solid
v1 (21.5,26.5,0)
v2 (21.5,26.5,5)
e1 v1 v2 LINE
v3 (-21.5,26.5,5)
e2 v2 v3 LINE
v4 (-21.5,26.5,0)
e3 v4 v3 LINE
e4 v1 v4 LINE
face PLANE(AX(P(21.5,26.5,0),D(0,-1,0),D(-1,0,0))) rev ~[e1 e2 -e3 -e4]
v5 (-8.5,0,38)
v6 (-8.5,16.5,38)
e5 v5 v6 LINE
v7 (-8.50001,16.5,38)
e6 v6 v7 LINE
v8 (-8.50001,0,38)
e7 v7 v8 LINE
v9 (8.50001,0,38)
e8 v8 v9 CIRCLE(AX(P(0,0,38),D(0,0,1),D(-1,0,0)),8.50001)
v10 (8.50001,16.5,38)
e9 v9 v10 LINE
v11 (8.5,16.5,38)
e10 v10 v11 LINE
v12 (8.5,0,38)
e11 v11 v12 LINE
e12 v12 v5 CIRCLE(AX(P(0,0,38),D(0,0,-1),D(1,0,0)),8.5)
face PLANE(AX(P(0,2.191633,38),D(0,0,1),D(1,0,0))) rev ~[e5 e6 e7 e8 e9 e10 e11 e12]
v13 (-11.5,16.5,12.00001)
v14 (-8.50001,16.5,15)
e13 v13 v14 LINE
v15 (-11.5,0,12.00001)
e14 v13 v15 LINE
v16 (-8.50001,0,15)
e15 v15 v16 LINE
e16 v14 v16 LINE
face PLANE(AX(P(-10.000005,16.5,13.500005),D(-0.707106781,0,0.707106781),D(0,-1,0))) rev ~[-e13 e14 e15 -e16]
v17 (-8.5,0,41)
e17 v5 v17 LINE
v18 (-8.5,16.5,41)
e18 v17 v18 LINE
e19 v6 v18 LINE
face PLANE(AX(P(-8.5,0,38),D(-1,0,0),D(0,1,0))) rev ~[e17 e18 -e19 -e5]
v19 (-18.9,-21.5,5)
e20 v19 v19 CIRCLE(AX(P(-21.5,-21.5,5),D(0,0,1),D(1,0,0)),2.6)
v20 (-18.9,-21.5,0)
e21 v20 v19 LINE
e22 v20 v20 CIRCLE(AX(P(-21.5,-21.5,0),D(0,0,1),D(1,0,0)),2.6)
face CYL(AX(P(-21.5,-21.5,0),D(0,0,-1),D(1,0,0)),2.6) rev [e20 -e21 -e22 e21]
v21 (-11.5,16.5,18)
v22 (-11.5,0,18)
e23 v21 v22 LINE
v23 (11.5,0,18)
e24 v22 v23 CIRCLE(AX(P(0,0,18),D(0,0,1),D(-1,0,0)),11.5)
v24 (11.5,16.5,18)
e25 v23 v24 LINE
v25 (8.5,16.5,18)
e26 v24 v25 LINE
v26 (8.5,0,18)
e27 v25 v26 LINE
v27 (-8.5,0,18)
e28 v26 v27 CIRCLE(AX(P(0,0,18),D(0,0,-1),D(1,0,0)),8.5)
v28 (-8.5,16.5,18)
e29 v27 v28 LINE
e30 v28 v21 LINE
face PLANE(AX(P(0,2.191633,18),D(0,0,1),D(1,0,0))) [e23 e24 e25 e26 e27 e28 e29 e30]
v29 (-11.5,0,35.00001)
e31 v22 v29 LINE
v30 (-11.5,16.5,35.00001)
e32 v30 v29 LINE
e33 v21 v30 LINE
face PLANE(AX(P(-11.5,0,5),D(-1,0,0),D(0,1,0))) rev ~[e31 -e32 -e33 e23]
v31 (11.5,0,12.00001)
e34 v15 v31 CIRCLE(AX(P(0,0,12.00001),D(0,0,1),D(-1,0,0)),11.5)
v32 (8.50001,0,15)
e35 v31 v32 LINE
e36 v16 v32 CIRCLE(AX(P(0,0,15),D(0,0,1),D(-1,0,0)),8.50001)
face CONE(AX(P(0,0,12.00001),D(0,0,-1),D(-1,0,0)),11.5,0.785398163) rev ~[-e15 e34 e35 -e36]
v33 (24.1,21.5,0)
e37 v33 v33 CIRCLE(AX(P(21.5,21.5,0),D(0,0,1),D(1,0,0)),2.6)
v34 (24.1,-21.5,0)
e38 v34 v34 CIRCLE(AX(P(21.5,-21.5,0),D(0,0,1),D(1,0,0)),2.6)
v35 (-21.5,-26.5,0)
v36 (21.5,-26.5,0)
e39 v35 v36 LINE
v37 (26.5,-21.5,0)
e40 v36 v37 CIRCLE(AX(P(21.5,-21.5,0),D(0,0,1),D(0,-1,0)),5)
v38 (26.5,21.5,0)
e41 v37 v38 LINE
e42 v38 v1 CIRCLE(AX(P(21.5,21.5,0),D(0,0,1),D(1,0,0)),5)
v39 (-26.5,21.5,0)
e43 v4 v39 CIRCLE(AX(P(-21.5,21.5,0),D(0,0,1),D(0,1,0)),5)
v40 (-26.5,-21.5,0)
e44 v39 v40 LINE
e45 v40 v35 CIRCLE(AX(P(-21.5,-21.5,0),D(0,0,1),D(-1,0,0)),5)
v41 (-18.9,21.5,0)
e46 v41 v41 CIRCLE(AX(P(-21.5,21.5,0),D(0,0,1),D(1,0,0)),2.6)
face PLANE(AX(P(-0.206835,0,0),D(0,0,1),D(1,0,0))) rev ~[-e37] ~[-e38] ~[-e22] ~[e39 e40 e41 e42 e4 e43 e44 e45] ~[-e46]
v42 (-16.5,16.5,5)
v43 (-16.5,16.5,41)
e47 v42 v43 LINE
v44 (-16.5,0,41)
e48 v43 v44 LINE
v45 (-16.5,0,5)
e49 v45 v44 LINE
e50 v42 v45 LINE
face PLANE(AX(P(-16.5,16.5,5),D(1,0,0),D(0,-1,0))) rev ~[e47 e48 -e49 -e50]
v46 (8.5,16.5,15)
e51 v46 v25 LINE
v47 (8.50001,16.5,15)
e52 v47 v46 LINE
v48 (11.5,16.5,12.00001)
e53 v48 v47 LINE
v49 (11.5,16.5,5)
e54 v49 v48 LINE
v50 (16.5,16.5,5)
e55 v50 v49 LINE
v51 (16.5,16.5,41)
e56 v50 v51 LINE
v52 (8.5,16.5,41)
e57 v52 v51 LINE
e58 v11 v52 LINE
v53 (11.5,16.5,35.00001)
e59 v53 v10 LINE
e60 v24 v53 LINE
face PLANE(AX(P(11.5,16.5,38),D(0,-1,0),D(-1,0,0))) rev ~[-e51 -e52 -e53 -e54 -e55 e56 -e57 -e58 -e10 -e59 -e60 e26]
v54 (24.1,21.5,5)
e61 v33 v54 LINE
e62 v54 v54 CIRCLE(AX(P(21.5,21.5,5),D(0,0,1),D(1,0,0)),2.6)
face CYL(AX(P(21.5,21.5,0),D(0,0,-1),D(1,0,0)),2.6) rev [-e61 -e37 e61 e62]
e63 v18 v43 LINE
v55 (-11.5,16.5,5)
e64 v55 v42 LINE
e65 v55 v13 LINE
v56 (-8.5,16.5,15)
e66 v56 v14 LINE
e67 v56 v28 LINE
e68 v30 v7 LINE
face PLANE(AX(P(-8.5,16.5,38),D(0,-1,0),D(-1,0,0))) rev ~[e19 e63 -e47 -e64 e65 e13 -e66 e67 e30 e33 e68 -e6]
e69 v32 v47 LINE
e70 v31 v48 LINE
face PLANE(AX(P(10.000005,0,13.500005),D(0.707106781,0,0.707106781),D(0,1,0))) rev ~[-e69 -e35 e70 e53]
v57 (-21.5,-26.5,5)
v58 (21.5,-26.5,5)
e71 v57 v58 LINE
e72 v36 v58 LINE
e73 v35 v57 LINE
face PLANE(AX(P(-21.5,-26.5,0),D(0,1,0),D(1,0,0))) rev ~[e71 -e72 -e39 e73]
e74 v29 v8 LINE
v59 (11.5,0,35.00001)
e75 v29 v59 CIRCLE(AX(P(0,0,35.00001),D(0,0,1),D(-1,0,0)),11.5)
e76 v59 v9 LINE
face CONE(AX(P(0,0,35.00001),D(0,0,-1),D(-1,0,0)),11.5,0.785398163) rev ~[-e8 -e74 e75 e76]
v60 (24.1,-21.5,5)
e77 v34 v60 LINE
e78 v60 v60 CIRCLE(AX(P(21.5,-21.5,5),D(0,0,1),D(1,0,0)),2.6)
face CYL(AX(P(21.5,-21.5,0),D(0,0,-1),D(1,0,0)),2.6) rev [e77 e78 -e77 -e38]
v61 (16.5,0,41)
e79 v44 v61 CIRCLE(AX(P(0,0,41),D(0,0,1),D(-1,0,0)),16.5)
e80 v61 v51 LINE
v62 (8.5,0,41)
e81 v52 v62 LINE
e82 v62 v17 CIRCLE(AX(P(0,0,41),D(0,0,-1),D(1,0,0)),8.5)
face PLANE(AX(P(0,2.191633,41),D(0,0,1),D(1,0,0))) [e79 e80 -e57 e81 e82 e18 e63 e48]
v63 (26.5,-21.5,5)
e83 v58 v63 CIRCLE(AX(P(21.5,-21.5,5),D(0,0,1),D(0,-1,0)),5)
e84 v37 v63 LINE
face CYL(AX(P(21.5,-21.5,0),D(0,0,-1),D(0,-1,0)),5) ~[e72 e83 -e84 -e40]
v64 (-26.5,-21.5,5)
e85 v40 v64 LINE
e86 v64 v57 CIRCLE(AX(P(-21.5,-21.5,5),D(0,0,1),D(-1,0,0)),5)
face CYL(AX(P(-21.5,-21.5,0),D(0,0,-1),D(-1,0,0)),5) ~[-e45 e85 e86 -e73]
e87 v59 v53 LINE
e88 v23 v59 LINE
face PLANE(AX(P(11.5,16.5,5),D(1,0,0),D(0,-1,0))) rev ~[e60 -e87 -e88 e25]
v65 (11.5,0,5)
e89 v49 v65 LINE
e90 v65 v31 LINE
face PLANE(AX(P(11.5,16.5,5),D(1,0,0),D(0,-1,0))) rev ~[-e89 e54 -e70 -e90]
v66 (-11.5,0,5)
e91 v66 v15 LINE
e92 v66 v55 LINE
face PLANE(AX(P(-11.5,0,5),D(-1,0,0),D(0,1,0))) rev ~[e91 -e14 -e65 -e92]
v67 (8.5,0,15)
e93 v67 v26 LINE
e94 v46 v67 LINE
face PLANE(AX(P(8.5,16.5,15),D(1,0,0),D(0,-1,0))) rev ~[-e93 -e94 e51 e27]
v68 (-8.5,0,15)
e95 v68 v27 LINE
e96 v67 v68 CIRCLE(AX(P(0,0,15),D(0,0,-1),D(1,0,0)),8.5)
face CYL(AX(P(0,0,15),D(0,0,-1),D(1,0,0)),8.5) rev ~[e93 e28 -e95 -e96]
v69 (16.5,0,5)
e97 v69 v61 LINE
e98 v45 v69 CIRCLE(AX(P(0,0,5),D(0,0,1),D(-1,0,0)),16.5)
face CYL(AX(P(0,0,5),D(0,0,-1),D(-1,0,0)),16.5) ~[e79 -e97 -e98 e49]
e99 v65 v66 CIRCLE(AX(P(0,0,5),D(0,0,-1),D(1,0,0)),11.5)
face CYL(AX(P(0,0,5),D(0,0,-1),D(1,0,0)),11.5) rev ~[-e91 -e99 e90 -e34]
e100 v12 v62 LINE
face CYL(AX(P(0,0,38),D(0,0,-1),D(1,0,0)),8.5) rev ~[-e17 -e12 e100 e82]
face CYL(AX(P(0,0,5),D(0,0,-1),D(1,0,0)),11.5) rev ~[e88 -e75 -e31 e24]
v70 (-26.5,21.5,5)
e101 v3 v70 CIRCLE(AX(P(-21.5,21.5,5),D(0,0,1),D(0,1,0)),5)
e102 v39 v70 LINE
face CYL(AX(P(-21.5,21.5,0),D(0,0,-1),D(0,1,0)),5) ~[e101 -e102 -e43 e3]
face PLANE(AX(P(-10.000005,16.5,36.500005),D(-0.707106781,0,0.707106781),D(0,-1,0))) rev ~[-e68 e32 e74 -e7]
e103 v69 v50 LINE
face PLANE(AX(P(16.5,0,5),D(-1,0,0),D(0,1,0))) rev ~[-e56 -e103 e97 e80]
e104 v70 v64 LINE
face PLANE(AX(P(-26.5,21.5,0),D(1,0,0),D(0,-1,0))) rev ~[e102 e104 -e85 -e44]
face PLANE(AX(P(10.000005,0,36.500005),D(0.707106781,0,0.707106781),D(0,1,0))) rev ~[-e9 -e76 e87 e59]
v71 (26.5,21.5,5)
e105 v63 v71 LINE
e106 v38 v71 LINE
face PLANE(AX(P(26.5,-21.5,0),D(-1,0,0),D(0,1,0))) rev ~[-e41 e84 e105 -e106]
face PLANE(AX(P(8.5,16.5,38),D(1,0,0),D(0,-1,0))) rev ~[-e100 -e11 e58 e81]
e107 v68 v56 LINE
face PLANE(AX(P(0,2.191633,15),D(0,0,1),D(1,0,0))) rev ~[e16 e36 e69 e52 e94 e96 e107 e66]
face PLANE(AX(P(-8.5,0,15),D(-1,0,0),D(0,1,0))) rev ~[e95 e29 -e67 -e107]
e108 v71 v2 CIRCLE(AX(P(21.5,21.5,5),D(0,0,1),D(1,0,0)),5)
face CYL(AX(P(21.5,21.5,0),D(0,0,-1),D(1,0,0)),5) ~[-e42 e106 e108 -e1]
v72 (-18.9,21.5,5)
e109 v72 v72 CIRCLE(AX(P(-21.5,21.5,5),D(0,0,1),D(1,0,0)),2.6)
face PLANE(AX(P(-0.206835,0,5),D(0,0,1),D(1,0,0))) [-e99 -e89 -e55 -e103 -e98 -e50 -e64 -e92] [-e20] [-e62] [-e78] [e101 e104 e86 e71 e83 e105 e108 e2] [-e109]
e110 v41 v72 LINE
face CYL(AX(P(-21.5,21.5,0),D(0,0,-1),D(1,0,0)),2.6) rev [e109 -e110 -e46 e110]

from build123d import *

# Parameters (mm, degrees)
F0_R     = 2.6
F1_DEPTH = 5
F3_DEPTH = 36
F6_DEPTH = 3
F9_DEPTH = 3
F10_SIZE = 2.99999


# Not quite as in the source:
# - a fillet or chamfer is up to 0.001 mm smaller than in the source, because OpenCascade refuses the exact size


with BuildPart() as f1:
    # F0 (on Top) → F1 (new body)
    with BuildSketch(Plane.XY):
        with BuildLine():
            Line((21.5, 26.5), (-21.5, 26.5))
            ThreePointArc((-21.5, 26.5), (-17.9644660941, 25.0355339059), (-16.5, 21.5))
            ThreePointArc((-16.5, 21.5), (-21.5, 16.5), (-26.5, 21.5))
            Line((-26.5, 21.5), (-26.5, -21.5))
            ThreePointArc((-26.5, -21.5), (-21.5, -16.5), (-16.5, -21.5))
            ThreePointArc((-16.5, -21.5), (-17.9644660941, -25.0355339059), (-21.5, -26.5))
            Line((-21.5, -26.5), (21.5, -26.5))
            ThreePointArc((21.5, -26.5), (17.9644660941, -17.9644660941), (26.5, -21.5))
            Line((26.5, -21.5), (26.5, 21.5))
            ThreePointArc((26.5, 21.5), (17.9644660941, 17.9644660941), (21.5, 26.5))
        make_face()
        with BuildLine():
            Line((-11.5, 16.5), (-11.5, 0))
            ThreePointArc((-11.5, 0), (0, -11.5), (11.5, 0))
            Line((11.5, 0), (11.5, 16.5))
            Line((11.5, 16.5), (16.5, 16.5))
            Line((16.5, 16.5), (16.5, 0))
            ThreePointArc((16.5, 0), (0, -16.5), (-16.5, 0))
            Line((-16.5, 0), (-16.5, 16.5))
            Line((-16.5, 16.5), (-11.5, 16.5))
        make_face(mode=Mode.SUBTRACT)
        with BuildLine():
            ThreePointArc((11.5, 0), (0, -11.5), (-11.5, 0))
            Line((-11.5, 0), (-11.5, 16.5))
            Line((-11.5, 16.5), (-16.5, 16.5))
            Line((-16.5, 16.5), (-16.5, 0))
            ThreePointArc((-16.5, 0), (0, -16.5), (16.5, 0))
            Line((16.5, 0), (16.5, 16.5))
            Line((16.5, 16.5), (11.5, 16.5))
            Line((11.5, 16.5), (11.5, 0))
        make_face()
        with BuildLine():
            ThreePointArc((-16.5, 21.5), (-17.9644660941, 25.0355339059), (-21.5, 26.5))
            ThreePointArc((-21.5, 26.5), (-25.0355339059, 25.0355339059), (-26.5, 21.5))
            ThreePointArc((-26.5, 21.5), (-21.5, 16.5), (-16.5, 21.5))
        make_face()
        with Locations((-21.5, 21.5)):
            Circle(F0_R, mode=Mode.SUBTRACT)
        with BuildLine():
            ThreePointArc((-16.5, -21.5), (-21.5, -16.5), (-26.5, -21.5))
            ThreePointArc((-26.5, -21.5), (-25.0355339059, -25.0355339059), (-21.5, -26.5))
            ThreePointArc((-21.5, -26.5), (-17.9644660941, -25.0355339059), (-16.5, -21.5))
        make_face()
        with Locations((-21.5, -21.5)):
            Circle(F0_R, mode=Mode.SUBTRACT)
        with BuildLine():
            ThreePointArc((21.5, -26.5), (25.0355339059, -25.0355339059), (26.5, -21.5))
            ThreePointArc((26.5, -21.5), (17.9644660941, -17.9644660941), (21.5, -26.5))
        make_face()
        with Locations((21.5, -21.5)):
            Circle(F0_R, mode=Mode.SUBTRACT)
        with BuildLine():
            ThreePointArc((26.5, 21.5), (25.0355339059, 25.0355339059), (21.5, 26.5))
            ThreePointArc((21.5, 26.5), (17.9644660941, 17.9644660941), (26.5, 21.5))
        make_face()
        with Locations((21.5, 21.5)):
            Circle(F0_R, mode=Mode.SUBTRACT)
    extrude(amount=F1_DEPTH)

    # F2 (on face) → F3 (join)
    with BuildSketch(Plane.XY.offset(5)):
        with BuildLine():
            ThreePointArc((11.5, 0), (0, -11.5), (-11.5, 0))
            Line((-11.5, 0), (-11.5, 16.5))
            Line((-11.5, 16.5), (-16.5, 16.5))
            Line((-16.5, 16.5), (-16.5, 0))
            ThreePointArc((-16.5, 0), (0, -16.5), (16.5, 0))
            Line((16.5, 0), (16.5, 16.5))
            Line((16.5, 16.5), (11.5, 16.5))
            Line((11.5, 16.5), (11.5, 0))
        make_face()
    extrude(amount=F3_DEPTH)

    # F5 (on offset) → F6 (join)
    with BuildSketch(Plane.XY.offset(15)):
        with BuildLine():
            Line((-11.5, 16.5), (-11.5, 0))
            ThreePointArc((-11.5, 0), (0, -11.5), (11.5, 0))
            Line((11.5, 0), (11.5, 16.5))
            Line((11.5, 16.5), (8.5, 16.5))
            Line((8.5, 16.5), (8.5, 0))
            ThreePointArc((8.5, 0), (0, -8.5), (-8.5, 0))
            Line((-8.5, 0), (-8.5, 16.5))
            Line((-8.5, 16.5), (-11.5, 16.5))
        make_face()
    extrude(amount=F6_DEPTH)

    # F8 (on offset) → F9 (join)
    with BuildSketch(Plane.XY.offset(38)):
        with BuildLine():
            Line((-11.5, 16.5), (-11.5, 0))
            ThreePointArc((-11.5, 0), (0, -11.5), (11.5, 0))
            Line((11.5, 0), (11.5, 16.5))
            Line((11.5, 16.5), (8.5, 16.5))
            Line((8.5, 16.5), (8.5, 0))
            ThreePointArc((8.5, 0), (0, -8.5), (-8.5, 0))
            Line((-8.5, 0), (-8.5, 16.5))
            Line((-8.5, 16.5), (-11.5, 16.5))
        make_face()
    extrude(amount=F9_DEPTH)

    # F10 (size 3 in the source; OpenCascade refuses exactly that, so slightly less here)
    f10_edges = [f1.edges().sort_by_distance(p)[0] for p in [
        (-11.5, 8.25, 38),
        (-11.5, 8.25, 15),
    ]]
    chamfer(f10_edges, length=F10_SIZE)


solid = f1.part
